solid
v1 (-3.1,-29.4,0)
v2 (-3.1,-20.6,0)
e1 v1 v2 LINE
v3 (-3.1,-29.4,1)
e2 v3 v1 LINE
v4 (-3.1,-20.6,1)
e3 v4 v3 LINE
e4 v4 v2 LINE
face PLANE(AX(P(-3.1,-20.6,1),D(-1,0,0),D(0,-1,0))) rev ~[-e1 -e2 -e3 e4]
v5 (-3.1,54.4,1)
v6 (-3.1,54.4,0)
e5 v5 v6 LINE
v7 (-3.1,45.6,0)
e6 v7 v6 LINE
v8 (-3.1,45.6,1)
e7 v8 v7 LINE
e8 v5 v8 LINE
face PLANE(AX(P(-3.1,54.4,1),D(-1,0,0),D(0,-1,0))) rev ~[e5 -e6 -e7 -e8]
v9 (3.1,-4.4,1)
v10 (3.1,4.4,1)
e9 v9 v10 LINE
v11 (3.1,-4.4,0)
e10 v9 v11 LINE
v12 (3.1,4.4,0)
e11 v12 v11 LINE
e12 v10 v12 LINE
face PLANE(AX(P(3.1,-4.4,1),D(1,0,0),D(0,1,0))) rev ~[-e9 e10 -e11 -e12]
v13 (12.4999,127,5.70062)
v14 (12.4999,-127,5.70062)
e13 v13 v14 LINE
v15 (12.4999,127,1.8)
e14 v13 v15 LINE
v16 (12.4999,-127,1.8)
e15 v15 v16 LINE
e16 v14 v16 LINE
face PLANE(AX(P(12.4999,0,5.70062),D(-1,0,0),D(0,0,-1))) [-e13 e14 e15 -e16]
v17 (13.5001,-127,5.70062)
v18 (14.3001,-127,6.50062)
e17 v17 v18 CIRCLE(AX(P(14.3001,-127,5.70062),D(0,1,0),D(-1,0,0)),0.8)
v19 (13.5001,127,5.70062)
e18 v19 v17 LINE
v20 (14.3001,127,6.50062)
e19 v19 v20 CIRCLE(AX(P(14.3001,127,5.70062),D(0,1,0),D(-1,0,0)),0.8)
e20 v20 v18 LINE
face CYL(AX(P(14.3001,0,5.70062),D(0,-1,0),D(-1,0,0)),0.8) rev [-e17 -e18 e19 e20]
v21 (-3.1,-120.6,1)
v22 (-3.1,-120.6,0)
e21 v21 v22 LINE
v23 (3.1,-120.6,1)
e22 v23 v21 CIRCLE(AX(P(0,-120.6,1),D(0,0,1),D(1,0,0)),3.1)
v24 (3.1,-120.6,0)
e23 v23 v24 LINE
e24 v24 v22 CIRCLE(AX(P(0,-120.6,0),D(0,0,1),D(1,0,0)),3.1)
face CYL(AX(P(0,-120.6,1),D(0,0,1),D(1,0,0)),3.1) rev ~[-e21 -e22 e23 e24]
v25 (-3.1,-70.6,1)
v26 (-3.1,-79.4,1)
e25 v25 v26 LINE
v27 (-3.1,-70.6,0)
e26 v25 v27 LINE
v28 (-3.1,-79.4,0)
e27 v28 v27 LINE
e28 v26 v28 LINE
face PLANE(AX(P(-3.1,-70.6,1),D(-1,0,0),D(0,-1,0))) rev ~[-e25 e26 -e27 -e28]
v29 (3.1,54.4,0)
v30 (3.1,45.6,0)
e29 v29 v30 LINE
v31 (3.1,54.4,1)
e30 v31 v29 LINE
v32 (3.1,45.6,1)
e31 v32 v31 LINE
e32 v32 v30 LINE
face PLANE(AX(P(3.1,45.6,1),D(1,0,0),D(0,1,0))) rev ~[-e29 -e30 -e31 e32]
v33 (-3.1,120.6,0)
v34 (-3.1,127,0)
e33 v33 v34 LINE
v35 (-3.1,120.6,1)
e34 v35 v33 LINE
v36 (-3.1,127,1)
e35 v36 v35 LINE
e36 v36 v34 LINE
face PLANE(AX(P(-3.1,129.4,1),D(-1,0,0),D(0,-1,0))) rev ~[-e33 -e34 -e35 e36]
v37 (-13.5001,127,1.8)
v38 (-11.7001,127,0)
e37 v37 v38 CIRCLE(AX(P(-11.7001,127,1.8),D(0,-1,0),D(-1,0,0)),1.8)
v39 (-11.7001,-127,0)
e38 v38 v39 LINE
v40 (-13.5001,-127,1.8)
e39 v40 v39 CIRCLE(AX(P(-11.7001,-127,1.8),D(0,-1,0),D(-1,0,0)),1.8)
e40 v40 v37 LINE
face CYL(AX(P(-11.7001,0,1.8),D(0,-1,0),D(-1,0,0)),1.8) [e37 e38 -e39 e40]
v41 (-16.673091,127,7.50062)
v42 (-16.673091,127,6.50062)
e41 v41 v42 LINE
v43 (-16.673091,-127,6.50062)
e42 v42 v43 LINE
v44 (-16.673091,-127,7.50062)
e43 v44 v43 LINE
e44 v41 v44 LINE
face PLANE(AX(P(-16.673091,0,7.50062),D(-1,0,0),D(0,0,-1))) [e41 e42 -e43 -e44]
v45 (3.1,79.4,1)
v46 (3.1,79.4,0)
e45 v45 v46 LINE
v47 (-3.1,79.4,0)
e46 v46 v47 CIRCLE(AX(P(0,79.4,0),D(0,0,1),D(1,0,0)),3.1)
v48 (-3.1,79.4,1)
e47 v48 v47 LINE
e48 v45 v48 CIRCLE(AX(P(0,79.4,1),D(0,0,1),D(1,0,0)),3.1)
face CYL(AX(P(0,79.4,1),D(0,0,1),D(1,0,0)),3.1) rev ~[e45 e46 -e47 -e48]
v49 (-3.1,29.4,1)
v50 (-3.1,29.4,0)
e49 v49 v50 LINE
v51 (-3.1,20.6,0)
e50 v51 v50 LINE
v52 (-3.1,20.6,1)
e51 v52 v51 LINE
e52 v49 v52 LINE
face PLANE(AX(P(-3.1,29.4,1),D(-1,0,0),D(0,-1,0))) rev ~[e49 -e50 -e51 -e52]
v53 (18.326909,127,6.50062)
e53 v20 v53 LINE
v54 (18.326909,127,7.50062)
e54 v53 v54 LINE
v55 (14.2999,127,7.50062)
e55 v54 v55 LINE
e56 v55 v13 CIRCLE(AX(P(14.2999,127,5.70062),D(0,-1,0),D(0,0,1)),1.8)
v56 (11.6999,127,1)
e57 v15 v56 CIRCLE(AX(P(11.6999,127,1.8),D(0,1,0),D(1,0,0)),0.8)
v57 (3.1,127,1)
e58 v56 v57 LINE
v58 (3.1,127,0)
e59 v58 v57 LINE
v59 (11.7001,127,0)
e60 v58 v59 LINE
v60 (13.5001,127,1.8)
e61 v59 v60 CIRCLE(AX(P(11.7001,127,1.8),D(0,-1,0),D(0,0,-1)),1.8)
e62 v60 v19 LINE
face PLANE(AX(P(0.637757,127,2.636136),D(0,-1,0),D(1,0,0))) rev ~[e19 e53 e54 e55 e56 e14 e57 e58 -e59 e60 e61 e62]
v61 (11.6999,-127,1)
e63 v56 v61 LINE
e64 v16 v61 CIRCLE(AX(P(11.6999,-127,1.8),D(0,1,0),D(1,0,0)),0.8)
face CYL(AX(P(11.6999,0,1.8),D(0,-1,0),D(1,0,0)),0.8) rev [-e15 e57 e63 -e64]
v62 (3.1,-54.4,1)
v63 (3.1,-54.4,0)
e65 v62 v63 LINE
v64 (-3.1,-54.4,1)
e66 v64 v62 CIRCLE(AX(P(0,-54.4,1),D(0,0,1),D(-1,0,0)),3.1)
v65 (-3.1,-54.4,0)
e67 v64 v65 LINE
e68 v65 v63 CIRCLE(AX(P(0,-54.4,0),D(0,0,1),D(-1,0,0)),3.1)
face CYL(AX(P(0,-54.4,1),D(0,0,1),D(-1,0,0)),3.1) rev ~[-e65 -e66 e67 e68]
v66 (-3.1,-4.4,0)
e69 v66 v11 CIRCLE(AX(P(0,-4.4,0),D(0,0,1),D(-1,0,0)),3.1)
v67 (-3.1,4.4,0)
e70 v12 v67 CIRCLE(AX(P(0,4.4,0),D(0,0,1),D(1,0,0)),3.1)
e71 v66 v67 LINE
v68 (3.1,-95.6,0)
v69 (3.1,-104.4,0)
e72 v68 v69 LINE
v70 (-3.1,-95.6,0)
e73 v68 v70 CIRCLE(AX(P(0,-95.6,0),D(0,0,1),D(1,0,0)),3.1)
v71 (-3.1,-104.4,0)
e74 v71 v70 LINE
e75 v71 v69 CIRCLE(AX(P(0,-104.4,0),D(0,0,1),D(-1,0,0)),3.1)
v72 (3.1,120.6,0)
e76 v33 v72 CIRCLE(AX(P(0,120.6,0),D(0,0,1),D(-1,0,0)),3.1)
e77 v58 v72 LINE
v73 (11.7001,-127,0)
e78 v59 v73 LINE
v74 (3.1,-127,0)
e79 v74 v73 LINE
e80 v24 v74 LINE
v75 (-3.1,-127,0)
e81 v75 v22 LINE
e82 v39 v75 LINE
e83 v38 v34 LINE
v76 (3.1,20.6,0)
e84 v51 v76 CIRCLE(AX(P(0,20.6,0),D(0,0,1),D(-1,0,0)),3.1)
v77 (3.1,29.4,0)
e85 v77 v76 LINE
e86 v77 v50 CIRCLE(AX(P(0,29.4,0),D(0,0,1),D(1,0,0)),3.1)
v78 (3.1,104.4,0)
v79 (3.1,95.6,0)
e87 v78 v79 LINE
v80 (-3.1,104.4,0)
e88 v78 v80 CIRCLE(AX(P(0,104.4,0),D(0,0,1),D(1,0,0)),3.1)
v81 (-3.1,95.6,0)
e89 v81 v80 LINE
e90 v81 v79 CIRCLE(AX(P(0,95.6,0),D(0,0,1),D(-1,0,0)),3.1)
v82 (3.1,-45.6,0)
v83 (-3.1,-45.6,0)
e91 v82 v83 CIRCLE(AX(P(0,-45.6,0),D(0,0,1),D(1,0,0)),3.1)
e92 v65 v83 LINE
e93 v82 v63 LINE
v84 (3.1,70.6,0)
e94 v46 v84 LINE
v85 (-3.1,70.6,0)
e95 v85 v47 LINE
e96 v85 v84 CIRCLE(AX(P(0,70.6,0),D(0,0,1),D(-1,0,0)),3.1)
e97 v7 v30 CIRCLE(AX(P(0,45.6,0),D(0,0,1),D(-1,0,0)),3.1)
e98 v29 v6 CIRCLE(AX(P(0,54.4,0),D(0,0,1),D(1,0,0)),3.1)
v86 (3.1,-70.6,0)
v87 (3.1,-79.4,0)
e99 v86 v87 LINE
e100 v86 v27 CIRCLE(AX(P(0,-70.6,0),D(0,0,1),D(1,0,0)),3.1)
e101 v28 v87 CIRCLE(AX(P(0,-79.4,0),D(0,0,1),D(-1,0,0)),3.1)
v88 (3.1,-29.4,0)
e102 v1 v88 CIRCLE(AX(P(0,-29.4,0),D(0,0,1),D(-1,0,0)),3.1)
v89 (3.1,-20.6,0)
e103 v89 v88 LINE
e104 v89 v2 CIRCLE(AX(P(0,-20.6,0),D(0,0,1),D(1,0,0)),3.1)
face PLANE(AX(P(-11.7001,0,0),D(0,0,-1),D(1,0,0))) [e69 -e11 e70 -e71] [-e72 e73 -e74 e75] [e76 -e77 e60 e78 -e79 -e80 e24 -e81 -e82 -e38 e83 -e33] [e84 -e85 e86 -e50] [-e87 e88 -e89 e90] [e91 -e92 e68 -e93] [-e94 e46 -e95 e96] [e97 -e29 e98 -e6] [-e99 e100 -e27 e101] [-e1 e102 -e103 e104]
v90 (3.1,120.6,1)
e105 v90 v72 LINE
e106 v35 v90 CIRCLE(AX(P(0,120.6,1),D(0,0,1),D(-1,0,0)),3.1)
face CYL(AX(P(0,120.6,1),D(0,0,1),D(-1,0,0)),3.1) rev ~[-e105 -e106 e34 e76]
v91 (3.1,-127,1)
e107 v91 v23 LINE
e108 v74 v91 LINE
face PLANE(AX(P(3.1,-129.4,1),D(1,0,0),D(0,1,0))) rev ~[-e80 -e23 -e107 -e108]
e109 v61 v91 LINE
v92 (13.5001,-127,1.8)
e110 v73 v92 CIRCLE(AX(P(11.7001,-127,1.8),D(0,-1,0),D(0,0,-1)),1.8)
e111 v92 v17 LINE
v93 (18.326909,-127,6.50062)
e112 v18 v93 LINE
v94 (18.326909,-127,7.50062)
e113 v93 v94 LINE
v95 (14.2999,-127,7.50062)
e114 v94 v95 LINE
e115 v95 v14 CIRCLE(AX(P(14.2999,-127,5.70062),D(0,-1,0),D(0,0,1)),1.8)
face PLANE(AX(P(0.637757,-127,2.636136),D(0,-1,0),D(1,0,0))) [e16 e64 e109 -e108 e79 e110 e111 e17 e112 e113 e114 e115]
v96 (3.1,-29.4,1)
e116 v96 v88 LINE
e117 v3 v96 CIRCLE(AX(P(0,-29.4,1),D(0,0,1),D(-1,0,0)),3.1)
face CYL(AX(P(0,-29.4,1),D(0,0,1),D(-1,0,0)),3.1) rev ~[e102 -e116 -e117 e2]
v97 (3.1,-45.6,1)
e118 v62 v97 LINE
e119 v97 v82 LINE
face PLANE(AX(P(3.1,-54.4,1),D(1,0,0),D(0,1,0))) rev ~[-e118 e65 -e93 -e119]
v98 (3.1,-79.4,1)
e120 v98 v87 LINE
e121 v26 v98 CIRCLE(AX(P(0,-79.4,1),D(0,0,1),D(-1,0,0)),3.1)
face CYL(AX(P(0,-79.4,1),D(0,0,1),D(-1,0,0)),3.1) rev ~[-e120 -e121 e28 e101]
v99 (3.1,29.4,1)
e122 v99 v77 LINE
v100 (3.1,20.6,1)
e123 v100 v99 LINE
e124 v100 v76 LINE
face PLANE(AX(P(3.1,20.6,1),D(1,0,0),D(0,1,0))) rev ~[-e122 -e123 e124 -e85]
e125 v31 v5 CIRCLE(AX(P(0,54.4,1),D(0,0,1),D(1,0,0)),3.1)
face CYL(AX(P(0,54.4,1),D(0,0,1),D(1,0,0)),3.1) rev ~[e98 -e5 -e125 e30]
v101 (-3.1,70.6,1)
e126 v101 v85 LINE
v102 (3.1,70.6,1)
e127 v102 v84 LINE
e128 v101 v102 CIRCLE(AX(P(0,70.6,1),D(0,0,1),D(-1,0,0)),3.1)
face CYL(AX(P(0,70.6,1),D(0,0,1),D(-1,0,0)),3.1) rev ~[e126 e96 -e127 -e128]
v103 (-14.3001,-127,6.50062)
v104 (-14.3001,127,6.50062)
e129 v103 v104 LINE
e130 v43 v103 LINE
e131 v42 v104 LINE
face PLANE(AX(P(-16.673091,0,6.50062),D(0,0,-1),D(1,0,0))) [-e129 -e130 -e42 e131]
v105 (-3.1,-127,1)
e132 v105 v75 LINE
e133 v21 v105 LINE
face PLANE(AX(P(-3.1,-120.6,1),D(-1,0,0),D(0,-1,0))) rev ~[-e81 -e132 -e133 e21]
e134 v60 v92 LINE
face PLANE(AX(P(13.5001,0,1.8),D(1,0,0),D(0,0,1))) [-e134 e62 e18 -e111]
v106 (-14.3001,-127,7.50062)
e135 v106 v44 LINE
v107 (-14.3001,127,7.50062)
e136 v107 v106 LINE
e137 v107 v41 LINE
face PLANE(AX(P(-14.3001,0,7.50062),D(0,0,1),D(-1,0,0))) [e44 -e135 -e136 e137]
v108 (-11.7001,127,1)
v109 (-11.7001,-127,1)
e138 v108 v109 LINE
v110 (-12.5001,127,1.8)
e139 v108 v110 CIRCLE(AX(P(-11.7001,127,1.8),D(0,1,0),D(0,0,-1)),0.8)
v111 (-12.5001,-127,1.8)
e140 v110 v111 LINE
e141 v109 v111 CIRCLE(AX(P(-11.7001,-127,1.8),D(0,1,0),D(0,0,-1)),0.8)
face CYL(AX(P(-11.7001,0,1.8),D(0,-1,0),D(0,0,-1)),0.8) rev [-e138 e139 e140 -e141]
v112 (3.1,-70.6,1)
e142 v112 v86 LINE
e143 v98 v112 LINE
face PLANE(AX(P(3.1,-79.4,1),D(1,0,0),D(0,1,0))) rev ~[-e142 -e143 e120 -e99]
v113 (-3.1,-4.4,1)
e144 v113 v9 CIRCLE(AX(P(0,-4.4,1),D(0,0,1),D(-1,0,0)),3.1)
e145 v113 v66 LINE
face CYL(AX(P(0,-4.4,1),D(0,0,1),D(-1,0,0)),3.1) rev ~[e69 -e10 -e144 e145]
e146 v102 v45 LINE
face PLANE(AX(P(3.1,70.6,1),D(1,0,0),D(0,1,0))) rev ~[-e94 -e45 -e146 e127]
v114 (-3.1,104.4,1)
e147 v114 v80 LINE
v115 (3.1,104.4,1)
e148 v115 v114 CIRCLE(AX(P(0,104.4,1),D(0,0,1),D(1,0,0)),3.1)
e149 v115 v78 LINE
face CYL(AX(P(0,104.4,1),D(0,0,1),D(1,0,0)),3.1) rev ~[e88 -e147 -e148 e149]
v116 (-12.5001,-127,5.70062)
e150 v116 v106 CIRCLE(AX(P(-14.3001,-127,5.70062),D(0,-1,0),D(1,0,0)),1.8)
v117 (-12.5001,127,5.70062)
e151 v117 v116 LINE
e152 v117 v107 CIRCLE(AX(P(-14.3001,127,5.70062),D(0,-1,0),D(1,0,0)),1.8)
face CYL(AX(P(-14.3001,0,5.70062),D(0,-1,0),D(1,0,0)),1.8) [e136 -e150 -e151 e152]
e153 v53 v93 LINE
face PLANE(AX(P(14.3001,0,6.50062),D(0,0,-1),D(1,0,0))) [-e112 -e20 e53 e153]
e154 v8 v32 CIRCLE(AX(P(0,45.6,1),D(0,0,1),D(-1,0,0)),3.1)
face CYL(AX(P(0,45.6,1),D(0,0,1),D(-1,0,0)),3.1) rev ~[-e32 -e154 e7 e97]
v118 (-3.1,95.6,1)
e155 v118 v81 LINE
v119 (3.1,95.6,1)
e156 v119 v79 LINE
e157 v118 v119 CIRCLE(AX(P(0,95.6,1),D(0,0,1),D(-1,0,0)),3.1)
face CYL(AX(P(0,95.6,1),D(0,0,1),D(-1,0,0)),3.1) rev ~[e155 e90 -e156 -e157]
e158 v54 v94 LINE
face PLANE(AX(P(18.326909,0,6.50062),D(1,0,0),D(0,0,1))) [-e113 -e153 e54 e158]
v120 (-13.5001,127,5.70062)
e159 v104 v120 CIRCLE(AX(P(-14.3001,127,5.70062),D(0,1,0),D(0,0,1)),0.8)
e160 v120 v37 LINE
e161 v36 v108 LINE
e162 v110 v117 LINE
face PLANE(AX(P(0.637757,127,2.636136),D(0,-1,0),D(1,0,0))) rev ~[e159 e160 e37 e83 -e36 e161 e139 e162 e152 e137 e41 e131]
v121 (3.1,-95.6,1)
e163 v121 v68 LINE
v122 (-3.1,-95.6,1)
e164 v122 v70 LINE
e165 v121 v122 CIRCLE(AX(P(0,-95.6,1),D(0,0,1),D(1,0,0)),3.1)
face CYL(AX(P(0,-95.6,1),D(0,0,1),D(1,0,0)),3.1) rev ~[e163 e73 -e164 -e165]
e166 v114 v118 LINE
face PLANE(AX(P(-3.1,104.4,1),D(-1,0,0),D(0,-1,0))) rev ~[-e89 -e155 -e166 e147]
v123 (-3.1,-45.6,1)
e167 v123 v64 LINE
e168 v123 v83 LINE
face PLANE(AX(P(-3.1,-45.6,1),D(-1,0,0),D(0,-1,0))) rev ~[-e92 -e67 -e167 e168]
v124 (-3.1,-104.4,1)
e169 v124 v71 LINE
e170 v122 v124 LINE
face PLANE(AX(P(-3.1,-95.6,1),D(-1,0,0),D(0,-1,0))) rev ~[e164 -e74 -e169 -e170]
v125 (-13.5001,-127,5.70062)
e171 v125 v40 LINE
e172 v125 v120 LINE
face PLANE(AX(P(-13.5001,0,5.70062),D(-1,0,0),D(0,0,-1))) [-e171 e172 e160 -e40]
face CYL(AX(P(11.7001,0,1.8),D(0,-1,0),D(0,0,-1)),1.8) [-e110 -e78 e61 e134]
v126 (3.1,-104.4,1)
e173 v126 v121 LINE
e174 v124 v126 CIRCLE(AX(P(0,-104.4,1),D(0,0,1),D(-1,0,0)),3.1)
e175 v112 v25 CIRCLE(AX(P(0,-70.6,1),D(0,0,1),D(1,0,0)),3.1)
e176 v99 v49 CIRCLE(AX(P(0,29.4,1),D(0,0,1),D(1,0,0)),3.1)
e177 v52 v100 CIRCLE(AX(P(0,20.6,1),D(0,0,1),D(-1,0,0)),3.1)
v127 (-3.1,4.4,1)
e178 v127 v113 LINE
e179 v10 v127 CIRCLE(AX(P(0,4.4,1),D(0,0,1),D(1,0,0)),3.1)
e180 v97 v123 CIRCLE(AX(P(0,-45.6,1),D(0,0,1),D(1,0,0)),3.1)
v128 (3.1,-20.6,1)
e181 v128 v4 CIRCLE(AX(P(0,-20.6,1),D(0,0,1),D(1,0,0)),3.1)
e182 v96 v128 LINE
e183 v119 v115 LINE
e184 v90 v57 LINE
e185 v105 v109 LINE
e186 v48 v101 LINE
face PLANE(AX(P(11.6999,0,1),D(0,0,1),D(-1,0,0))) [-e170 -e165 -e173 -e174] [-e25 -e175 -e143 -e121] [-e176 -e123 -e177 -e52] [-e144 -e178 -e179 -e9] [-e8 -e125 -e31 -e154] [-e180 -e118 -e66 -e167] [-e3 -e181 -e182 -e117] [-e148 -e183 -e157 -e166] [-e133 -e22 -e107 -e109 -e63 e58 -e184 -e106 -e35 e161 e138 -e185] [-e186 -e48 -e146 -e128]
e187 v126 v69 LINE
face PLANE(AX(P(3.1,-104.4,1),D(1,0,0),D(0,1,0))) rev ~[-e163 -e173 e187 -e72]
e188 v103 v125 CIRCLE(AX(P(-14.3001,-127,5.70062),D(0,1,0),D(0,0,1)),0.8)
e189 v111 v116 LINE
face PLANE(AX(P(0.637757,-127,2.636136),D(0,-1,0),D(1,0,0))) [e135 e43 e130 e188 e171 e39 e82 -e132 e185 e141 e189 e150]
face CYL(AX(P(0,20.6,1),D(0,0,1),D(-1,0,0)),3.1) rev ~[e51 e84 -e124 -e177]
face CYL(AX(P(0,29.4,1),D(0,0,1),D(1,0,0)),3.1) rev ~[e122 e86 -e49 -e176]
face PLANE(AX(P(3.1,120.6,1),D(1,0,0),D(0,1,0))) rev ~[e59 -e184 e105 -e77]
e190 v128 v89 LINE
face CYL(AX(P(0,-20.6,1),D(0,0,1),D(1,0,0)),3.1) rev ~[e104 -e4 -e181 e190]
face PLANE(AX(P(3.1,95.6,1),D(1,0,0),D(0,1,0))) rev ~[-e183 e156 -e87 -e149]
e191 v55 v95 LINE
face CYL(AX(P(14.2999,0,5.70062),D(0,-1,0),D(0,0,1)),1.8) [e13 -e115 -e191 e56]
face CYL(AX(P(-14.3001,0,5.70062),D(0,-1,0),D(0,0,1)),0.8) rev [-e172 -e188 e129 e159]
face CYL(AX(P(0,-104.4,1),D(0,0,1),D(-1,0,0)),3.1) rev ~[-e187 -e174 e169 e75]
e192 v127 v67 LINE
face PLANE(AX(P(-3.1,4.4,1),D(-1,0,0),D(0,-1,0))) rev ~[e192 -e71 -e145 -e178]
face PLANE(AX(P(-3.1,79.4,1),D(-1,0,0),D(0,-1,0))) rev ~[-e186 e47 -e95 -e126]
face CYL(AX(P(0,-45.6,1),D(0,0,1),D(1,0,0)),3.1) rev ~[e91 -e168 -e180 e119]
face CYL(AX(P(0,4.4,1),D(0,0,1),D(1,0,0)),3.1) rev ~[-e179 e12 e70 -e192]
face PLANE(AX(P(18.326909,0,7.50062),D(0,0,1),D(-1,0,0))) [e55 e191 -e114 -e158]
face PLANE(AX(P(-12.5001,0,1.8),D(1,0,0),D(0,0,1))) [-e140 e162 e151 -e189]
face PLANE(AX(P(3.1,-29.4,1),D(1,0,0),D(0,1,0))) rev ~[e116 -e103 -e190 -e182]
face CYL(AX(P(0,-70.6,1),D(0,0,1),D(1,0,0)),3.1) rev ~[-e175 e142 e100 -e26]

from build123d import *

# Parameters (mm, degrees)
F1_DEPTH = 127
F3_DEPTH = 1.001
F4_DEPTH = 1


# Not quite as in the source:
# - a feature names something its author has since deleted; it is built from what else it names


with BuildPart() as f1:
    # F0 (on Front) → F1 (new body, symmetric)
    with BuildSketch(Plane.XZ):
        with BuildLine():
            ThreePointArc((-13.5001, 1.8), (-12.9728922061, 0.5272077939), (-11.7001, 0))
            Line((-11.7001, 0), (11.7001, 0))
            ThreePointArc((11.7001, 0), (12.9728922061, 0.5272077939), (13.5001, 1.8))
            Line((13.5001, 1.8), (13.5001, 5.70062))
            ThreePointArc((13.5001, 5.70062), (13.7344145751, 6.2663054249), (14.3001, 6.50062))
            Line((14.3001, 6.50062), (18.3269093243, 6.50062))
            Line((18.3269093243, 6.50062), (18.3269093243, 7.50062))
            Line((18.3269093243, 7.50062), (14.2999, 7.50062))
            ThreePointArc((14.2999, 7.50062), (13.0271077939, 6.9734122061), (12.4999, 5.70062))
            Line((12.4999, 5.70062), (12.4999, 1.8))
            ThreePointArc((12.4999, 1.8), (12.2655854249, 1.2343145751), (11.6999, 1))
            Line((11.6999, 1), (-11.7001, 1))
            ThreePointArc((-11.7001, 1), (-12.2657854249, 1.2343145751), (-12.5001, 1.8))
            Line((-12.5001, 1.8), (-12.5001, 5.70062))
            ThreePointArc((-12.5001, 5.70062), (-13.0273077939, 6.9734122061), (-14.3001, 7.50062))
            Line((-14.3001, 7.50062), (-16.6730906757, 7.50062))
            Line((-16.6730906757, 7.50062), (-16.6730906757, 6.50062))
            Line((-16.6730906757, 6.50062), (-14.3001, 6.50062))
            ThreePointArc((-14.3001, 6.50062), (-13.7344145751, 6.2663054249), (-13.5001, 5.70062))
            Line((-13.5001, 5.70062), (-13.5001, 1.8))
        make_face()
    extrude(amount=F1_DEPTH, both=True)

    # F2 (on face) → F3 (cut, through all)
    with BuildSketch(Plane.XY.offset(1)):
        with BuildLine():
            ThreePointArc((-3.1, -4.4), (0, -7.5), (3.1, -4.4))
            Line((3.1, -4.4), (3.1, 4.4))
            ThreePointArc((3.1, 4.4), (0, 7.5), (-3.1, 4.4))
            Line((-3.1, 4.4), (-3.1, -4.4))
        make_face()
        with BuildLine():
            ThreePointArc((-3.1, 20.6), (0, 17.5), (3.1, 20.6))
            Line((3.1, 20.6), (3.1, 29.4))
            ThreePointArc((3.1, 29.4), (0, 32.5), (-3.1, 29.4))
            Line((-3.1, 29.4), (-3.1, 20.6))
        make_face()
        with BuildLine():
            ThreePointArc((-3.1, 45.6), (0, 42.5), (3.1, 45.6))
            Line((3.1, 45.6), (3.1, 54.4))
            ThreePointArc((3.1, 54.4), (0, 57.5), (-3.1, 54.4))
            Line((-3.1, 54.4), (-3.1, 45.6))
        make_face()
        with BuildLine():
            ThreePointArc((-3.1, 70.6), (0, 67.5), (3.1, 70.6))
            Line((3.1, 70.6), (3.1, 79.4))
            ThreePointArc((3.1, 79.4), (0, 82.5), (-3.1, 79.4))
            Line((-3.1, 79.4), (-3.1, 70.6))
        make_face()
        with BuildLine():
            ThreePointArc((-3.1, 95.6), (0, 92.5), (3.1, 95.6))
            Line((3.1, 95.6), (3.1, 104.4))
            ThreePointArc((3.1, 104.4), (0, 107.5), (-3.1, 104.4))
            Line((-3.1, 104.4), (-3.1, 95.6))
        make_face()
        with BuildLine():
            ThreePointArc((-3.1, 120.6), (0, 117.5), (3.1, 120.6))
            Line((3.1, 120.6), (3.1, 129.4))
            ThreePointArc((3.1, 129.4), (0, 132.5), (-3.1, 129.4))
            Line((-3.1, 129.4), (-3.1, 120.6))
        make_face()
        with BuildLine():
            ThreePointArc((-3.1, -29.4), (0, -32.5), (3.1, -29.4))
            Line((3.1, -29.4), (3.1, -20.6))
            ThreePointArc((3.1, -20.6), (0, -17.5), (-3.1, -20.6))
            Line((-3.1, -20.6), (-3.1, -29.4))
        make_face()
        with BuildLine():
            ThreePointArc((3.1, -45.6), (0, -42.5), (-3.1, -45.6))
            Line((-3.1, -45.6), (-3.1, -54.4))
            ThreePointArc((-3.1, -54.4), (0, -57.5), (3.1, -54.4))
            Line((3.1, -54.4), (3.1, -45.6))
        make_face()
        with BuildLine():
            ThreePointArc((-3.1, -79.4), (0, -82.5), (3.1, -79.4))
            Line((3.1, -79.4), (3.1, -70.6))
            ThreePointArc((3.1, -70.6), (0, -67.5), (-3.1, -70.6))
            Line((-3.1, -70.6), (-3.1, -79.4))
        make_face()
        with BuildLine():
            ThreePointArc((3.1, -95.6), (0, -92.5), (-3.1, -95.6))
            Line((-3.1, -95.6), (-3.1, -104.4))
            ThreePointArc((-3.1, -104.4), (0, -107.5), (3.1, -104.4))
            Line((3.1, -104.4), (3.1, -95.6))
        make_face()
        with BuildLine():
            ThreePointArc((3.1, -120.6), (0, -117.5), (-3.1, -120.6))
            Line((-3.1, -120.6), (-3.1, -129.4))
            ThreePointArc((-3.1, -129.4), (0, -132.5), (3.1, -129.4))
            Line((3.1, -129.4), (3.1, -120.6))
        make_face()
    extrude(amount=-F3_DEPTH, mode=Mode.SUBTRACT)

    # F2 (on face) → F4 (cut, through all)
    with BuildSketch(Plane.XY.offset(1)):
        with BuildLine():
            ThreePointArc((-3.1, 95.6), (0, 92.5), (3.1, 95.6))
            Line((3.1, 95.6), (3.1, 104.4))
            ThreePointArc((3.1, 104.4), (0, 107.5), (-3.1, 104.4))
            Line((-3.1, 104.4), (-3.1, 95.6))
        make_face()
        with BuildLine():
            ThreePointArc((-3.1, 70.6), (0, 67.5), (3.1, 70.6))
            Line((3.1, 70.6), (3.1, 79.4))
            ThreePointArc((3.1, 79.4), (0, 82.5), (-3.1, 79.4))
            Line((-3.1, 79.4), (-3.1, 70.6))
        make_face()
        with BuildLine():
            ThreePointArc((-3.1, 45.6), (0, 42.5), (3.1, 45.6))
            Line((3.1, 45.6), (3.1, 54.4))
            ThreePointArc((3.1, 54.4), (0, 57.5), (-3.1, 54.4))
            Line((-3.1, 54.4), (-3.1, 45.6))
        make_face()
        with BuildLine():
            ThreePointArc((-3.1, 20.6), (0, 17.5), (3.1, 20.6))
            Line((3.1, 20.6), (3.1, 29.4))
            ThreePointArc((3.1, 29.4), (0, 32.5), (-3.1, 29.4))
            Line((-3.1, 29.4), (-3.1, 20.6))
        make_face()
        with BuildLine():
            ThreePointArc((-3.1, -4.4), (0, -7.5), (3.1, -4.4))
            Line((3.1, -4.4), (3.1, 4.4))
            ThreePointArc((3.1, 4.4), (0, 7.5), (-3.1, 4.4))
            Line((-3.1, 4.4), (-3.1, -4.4))
        make_face()
        with BuildLine():
            ThreePointArc((-3.1, 120.6), (0, 117.5), (3.1, 120.6))
            Line((3.1, 120.6), (3.1, 127))
            Line((3.1, 127), (-3.1, 127))
            Line((-3.1, 127), (-3.1, 120.6))
        make_face()
        with BuildLine():
            Line((-3.1, 127), (3.1, 127))
            Line((3.1, 127), (3.1, 129.4))
            ThreePointArc((3.1, 129.4), (0, 132.5), (-3.1, 129.4))
            Line((-3.1, 129.4), (-3.1, 127))
        make_face()
    extrude(amount=-F4_DEPTH, mode=Mode.SUBTRACT)


solid = f1.part
